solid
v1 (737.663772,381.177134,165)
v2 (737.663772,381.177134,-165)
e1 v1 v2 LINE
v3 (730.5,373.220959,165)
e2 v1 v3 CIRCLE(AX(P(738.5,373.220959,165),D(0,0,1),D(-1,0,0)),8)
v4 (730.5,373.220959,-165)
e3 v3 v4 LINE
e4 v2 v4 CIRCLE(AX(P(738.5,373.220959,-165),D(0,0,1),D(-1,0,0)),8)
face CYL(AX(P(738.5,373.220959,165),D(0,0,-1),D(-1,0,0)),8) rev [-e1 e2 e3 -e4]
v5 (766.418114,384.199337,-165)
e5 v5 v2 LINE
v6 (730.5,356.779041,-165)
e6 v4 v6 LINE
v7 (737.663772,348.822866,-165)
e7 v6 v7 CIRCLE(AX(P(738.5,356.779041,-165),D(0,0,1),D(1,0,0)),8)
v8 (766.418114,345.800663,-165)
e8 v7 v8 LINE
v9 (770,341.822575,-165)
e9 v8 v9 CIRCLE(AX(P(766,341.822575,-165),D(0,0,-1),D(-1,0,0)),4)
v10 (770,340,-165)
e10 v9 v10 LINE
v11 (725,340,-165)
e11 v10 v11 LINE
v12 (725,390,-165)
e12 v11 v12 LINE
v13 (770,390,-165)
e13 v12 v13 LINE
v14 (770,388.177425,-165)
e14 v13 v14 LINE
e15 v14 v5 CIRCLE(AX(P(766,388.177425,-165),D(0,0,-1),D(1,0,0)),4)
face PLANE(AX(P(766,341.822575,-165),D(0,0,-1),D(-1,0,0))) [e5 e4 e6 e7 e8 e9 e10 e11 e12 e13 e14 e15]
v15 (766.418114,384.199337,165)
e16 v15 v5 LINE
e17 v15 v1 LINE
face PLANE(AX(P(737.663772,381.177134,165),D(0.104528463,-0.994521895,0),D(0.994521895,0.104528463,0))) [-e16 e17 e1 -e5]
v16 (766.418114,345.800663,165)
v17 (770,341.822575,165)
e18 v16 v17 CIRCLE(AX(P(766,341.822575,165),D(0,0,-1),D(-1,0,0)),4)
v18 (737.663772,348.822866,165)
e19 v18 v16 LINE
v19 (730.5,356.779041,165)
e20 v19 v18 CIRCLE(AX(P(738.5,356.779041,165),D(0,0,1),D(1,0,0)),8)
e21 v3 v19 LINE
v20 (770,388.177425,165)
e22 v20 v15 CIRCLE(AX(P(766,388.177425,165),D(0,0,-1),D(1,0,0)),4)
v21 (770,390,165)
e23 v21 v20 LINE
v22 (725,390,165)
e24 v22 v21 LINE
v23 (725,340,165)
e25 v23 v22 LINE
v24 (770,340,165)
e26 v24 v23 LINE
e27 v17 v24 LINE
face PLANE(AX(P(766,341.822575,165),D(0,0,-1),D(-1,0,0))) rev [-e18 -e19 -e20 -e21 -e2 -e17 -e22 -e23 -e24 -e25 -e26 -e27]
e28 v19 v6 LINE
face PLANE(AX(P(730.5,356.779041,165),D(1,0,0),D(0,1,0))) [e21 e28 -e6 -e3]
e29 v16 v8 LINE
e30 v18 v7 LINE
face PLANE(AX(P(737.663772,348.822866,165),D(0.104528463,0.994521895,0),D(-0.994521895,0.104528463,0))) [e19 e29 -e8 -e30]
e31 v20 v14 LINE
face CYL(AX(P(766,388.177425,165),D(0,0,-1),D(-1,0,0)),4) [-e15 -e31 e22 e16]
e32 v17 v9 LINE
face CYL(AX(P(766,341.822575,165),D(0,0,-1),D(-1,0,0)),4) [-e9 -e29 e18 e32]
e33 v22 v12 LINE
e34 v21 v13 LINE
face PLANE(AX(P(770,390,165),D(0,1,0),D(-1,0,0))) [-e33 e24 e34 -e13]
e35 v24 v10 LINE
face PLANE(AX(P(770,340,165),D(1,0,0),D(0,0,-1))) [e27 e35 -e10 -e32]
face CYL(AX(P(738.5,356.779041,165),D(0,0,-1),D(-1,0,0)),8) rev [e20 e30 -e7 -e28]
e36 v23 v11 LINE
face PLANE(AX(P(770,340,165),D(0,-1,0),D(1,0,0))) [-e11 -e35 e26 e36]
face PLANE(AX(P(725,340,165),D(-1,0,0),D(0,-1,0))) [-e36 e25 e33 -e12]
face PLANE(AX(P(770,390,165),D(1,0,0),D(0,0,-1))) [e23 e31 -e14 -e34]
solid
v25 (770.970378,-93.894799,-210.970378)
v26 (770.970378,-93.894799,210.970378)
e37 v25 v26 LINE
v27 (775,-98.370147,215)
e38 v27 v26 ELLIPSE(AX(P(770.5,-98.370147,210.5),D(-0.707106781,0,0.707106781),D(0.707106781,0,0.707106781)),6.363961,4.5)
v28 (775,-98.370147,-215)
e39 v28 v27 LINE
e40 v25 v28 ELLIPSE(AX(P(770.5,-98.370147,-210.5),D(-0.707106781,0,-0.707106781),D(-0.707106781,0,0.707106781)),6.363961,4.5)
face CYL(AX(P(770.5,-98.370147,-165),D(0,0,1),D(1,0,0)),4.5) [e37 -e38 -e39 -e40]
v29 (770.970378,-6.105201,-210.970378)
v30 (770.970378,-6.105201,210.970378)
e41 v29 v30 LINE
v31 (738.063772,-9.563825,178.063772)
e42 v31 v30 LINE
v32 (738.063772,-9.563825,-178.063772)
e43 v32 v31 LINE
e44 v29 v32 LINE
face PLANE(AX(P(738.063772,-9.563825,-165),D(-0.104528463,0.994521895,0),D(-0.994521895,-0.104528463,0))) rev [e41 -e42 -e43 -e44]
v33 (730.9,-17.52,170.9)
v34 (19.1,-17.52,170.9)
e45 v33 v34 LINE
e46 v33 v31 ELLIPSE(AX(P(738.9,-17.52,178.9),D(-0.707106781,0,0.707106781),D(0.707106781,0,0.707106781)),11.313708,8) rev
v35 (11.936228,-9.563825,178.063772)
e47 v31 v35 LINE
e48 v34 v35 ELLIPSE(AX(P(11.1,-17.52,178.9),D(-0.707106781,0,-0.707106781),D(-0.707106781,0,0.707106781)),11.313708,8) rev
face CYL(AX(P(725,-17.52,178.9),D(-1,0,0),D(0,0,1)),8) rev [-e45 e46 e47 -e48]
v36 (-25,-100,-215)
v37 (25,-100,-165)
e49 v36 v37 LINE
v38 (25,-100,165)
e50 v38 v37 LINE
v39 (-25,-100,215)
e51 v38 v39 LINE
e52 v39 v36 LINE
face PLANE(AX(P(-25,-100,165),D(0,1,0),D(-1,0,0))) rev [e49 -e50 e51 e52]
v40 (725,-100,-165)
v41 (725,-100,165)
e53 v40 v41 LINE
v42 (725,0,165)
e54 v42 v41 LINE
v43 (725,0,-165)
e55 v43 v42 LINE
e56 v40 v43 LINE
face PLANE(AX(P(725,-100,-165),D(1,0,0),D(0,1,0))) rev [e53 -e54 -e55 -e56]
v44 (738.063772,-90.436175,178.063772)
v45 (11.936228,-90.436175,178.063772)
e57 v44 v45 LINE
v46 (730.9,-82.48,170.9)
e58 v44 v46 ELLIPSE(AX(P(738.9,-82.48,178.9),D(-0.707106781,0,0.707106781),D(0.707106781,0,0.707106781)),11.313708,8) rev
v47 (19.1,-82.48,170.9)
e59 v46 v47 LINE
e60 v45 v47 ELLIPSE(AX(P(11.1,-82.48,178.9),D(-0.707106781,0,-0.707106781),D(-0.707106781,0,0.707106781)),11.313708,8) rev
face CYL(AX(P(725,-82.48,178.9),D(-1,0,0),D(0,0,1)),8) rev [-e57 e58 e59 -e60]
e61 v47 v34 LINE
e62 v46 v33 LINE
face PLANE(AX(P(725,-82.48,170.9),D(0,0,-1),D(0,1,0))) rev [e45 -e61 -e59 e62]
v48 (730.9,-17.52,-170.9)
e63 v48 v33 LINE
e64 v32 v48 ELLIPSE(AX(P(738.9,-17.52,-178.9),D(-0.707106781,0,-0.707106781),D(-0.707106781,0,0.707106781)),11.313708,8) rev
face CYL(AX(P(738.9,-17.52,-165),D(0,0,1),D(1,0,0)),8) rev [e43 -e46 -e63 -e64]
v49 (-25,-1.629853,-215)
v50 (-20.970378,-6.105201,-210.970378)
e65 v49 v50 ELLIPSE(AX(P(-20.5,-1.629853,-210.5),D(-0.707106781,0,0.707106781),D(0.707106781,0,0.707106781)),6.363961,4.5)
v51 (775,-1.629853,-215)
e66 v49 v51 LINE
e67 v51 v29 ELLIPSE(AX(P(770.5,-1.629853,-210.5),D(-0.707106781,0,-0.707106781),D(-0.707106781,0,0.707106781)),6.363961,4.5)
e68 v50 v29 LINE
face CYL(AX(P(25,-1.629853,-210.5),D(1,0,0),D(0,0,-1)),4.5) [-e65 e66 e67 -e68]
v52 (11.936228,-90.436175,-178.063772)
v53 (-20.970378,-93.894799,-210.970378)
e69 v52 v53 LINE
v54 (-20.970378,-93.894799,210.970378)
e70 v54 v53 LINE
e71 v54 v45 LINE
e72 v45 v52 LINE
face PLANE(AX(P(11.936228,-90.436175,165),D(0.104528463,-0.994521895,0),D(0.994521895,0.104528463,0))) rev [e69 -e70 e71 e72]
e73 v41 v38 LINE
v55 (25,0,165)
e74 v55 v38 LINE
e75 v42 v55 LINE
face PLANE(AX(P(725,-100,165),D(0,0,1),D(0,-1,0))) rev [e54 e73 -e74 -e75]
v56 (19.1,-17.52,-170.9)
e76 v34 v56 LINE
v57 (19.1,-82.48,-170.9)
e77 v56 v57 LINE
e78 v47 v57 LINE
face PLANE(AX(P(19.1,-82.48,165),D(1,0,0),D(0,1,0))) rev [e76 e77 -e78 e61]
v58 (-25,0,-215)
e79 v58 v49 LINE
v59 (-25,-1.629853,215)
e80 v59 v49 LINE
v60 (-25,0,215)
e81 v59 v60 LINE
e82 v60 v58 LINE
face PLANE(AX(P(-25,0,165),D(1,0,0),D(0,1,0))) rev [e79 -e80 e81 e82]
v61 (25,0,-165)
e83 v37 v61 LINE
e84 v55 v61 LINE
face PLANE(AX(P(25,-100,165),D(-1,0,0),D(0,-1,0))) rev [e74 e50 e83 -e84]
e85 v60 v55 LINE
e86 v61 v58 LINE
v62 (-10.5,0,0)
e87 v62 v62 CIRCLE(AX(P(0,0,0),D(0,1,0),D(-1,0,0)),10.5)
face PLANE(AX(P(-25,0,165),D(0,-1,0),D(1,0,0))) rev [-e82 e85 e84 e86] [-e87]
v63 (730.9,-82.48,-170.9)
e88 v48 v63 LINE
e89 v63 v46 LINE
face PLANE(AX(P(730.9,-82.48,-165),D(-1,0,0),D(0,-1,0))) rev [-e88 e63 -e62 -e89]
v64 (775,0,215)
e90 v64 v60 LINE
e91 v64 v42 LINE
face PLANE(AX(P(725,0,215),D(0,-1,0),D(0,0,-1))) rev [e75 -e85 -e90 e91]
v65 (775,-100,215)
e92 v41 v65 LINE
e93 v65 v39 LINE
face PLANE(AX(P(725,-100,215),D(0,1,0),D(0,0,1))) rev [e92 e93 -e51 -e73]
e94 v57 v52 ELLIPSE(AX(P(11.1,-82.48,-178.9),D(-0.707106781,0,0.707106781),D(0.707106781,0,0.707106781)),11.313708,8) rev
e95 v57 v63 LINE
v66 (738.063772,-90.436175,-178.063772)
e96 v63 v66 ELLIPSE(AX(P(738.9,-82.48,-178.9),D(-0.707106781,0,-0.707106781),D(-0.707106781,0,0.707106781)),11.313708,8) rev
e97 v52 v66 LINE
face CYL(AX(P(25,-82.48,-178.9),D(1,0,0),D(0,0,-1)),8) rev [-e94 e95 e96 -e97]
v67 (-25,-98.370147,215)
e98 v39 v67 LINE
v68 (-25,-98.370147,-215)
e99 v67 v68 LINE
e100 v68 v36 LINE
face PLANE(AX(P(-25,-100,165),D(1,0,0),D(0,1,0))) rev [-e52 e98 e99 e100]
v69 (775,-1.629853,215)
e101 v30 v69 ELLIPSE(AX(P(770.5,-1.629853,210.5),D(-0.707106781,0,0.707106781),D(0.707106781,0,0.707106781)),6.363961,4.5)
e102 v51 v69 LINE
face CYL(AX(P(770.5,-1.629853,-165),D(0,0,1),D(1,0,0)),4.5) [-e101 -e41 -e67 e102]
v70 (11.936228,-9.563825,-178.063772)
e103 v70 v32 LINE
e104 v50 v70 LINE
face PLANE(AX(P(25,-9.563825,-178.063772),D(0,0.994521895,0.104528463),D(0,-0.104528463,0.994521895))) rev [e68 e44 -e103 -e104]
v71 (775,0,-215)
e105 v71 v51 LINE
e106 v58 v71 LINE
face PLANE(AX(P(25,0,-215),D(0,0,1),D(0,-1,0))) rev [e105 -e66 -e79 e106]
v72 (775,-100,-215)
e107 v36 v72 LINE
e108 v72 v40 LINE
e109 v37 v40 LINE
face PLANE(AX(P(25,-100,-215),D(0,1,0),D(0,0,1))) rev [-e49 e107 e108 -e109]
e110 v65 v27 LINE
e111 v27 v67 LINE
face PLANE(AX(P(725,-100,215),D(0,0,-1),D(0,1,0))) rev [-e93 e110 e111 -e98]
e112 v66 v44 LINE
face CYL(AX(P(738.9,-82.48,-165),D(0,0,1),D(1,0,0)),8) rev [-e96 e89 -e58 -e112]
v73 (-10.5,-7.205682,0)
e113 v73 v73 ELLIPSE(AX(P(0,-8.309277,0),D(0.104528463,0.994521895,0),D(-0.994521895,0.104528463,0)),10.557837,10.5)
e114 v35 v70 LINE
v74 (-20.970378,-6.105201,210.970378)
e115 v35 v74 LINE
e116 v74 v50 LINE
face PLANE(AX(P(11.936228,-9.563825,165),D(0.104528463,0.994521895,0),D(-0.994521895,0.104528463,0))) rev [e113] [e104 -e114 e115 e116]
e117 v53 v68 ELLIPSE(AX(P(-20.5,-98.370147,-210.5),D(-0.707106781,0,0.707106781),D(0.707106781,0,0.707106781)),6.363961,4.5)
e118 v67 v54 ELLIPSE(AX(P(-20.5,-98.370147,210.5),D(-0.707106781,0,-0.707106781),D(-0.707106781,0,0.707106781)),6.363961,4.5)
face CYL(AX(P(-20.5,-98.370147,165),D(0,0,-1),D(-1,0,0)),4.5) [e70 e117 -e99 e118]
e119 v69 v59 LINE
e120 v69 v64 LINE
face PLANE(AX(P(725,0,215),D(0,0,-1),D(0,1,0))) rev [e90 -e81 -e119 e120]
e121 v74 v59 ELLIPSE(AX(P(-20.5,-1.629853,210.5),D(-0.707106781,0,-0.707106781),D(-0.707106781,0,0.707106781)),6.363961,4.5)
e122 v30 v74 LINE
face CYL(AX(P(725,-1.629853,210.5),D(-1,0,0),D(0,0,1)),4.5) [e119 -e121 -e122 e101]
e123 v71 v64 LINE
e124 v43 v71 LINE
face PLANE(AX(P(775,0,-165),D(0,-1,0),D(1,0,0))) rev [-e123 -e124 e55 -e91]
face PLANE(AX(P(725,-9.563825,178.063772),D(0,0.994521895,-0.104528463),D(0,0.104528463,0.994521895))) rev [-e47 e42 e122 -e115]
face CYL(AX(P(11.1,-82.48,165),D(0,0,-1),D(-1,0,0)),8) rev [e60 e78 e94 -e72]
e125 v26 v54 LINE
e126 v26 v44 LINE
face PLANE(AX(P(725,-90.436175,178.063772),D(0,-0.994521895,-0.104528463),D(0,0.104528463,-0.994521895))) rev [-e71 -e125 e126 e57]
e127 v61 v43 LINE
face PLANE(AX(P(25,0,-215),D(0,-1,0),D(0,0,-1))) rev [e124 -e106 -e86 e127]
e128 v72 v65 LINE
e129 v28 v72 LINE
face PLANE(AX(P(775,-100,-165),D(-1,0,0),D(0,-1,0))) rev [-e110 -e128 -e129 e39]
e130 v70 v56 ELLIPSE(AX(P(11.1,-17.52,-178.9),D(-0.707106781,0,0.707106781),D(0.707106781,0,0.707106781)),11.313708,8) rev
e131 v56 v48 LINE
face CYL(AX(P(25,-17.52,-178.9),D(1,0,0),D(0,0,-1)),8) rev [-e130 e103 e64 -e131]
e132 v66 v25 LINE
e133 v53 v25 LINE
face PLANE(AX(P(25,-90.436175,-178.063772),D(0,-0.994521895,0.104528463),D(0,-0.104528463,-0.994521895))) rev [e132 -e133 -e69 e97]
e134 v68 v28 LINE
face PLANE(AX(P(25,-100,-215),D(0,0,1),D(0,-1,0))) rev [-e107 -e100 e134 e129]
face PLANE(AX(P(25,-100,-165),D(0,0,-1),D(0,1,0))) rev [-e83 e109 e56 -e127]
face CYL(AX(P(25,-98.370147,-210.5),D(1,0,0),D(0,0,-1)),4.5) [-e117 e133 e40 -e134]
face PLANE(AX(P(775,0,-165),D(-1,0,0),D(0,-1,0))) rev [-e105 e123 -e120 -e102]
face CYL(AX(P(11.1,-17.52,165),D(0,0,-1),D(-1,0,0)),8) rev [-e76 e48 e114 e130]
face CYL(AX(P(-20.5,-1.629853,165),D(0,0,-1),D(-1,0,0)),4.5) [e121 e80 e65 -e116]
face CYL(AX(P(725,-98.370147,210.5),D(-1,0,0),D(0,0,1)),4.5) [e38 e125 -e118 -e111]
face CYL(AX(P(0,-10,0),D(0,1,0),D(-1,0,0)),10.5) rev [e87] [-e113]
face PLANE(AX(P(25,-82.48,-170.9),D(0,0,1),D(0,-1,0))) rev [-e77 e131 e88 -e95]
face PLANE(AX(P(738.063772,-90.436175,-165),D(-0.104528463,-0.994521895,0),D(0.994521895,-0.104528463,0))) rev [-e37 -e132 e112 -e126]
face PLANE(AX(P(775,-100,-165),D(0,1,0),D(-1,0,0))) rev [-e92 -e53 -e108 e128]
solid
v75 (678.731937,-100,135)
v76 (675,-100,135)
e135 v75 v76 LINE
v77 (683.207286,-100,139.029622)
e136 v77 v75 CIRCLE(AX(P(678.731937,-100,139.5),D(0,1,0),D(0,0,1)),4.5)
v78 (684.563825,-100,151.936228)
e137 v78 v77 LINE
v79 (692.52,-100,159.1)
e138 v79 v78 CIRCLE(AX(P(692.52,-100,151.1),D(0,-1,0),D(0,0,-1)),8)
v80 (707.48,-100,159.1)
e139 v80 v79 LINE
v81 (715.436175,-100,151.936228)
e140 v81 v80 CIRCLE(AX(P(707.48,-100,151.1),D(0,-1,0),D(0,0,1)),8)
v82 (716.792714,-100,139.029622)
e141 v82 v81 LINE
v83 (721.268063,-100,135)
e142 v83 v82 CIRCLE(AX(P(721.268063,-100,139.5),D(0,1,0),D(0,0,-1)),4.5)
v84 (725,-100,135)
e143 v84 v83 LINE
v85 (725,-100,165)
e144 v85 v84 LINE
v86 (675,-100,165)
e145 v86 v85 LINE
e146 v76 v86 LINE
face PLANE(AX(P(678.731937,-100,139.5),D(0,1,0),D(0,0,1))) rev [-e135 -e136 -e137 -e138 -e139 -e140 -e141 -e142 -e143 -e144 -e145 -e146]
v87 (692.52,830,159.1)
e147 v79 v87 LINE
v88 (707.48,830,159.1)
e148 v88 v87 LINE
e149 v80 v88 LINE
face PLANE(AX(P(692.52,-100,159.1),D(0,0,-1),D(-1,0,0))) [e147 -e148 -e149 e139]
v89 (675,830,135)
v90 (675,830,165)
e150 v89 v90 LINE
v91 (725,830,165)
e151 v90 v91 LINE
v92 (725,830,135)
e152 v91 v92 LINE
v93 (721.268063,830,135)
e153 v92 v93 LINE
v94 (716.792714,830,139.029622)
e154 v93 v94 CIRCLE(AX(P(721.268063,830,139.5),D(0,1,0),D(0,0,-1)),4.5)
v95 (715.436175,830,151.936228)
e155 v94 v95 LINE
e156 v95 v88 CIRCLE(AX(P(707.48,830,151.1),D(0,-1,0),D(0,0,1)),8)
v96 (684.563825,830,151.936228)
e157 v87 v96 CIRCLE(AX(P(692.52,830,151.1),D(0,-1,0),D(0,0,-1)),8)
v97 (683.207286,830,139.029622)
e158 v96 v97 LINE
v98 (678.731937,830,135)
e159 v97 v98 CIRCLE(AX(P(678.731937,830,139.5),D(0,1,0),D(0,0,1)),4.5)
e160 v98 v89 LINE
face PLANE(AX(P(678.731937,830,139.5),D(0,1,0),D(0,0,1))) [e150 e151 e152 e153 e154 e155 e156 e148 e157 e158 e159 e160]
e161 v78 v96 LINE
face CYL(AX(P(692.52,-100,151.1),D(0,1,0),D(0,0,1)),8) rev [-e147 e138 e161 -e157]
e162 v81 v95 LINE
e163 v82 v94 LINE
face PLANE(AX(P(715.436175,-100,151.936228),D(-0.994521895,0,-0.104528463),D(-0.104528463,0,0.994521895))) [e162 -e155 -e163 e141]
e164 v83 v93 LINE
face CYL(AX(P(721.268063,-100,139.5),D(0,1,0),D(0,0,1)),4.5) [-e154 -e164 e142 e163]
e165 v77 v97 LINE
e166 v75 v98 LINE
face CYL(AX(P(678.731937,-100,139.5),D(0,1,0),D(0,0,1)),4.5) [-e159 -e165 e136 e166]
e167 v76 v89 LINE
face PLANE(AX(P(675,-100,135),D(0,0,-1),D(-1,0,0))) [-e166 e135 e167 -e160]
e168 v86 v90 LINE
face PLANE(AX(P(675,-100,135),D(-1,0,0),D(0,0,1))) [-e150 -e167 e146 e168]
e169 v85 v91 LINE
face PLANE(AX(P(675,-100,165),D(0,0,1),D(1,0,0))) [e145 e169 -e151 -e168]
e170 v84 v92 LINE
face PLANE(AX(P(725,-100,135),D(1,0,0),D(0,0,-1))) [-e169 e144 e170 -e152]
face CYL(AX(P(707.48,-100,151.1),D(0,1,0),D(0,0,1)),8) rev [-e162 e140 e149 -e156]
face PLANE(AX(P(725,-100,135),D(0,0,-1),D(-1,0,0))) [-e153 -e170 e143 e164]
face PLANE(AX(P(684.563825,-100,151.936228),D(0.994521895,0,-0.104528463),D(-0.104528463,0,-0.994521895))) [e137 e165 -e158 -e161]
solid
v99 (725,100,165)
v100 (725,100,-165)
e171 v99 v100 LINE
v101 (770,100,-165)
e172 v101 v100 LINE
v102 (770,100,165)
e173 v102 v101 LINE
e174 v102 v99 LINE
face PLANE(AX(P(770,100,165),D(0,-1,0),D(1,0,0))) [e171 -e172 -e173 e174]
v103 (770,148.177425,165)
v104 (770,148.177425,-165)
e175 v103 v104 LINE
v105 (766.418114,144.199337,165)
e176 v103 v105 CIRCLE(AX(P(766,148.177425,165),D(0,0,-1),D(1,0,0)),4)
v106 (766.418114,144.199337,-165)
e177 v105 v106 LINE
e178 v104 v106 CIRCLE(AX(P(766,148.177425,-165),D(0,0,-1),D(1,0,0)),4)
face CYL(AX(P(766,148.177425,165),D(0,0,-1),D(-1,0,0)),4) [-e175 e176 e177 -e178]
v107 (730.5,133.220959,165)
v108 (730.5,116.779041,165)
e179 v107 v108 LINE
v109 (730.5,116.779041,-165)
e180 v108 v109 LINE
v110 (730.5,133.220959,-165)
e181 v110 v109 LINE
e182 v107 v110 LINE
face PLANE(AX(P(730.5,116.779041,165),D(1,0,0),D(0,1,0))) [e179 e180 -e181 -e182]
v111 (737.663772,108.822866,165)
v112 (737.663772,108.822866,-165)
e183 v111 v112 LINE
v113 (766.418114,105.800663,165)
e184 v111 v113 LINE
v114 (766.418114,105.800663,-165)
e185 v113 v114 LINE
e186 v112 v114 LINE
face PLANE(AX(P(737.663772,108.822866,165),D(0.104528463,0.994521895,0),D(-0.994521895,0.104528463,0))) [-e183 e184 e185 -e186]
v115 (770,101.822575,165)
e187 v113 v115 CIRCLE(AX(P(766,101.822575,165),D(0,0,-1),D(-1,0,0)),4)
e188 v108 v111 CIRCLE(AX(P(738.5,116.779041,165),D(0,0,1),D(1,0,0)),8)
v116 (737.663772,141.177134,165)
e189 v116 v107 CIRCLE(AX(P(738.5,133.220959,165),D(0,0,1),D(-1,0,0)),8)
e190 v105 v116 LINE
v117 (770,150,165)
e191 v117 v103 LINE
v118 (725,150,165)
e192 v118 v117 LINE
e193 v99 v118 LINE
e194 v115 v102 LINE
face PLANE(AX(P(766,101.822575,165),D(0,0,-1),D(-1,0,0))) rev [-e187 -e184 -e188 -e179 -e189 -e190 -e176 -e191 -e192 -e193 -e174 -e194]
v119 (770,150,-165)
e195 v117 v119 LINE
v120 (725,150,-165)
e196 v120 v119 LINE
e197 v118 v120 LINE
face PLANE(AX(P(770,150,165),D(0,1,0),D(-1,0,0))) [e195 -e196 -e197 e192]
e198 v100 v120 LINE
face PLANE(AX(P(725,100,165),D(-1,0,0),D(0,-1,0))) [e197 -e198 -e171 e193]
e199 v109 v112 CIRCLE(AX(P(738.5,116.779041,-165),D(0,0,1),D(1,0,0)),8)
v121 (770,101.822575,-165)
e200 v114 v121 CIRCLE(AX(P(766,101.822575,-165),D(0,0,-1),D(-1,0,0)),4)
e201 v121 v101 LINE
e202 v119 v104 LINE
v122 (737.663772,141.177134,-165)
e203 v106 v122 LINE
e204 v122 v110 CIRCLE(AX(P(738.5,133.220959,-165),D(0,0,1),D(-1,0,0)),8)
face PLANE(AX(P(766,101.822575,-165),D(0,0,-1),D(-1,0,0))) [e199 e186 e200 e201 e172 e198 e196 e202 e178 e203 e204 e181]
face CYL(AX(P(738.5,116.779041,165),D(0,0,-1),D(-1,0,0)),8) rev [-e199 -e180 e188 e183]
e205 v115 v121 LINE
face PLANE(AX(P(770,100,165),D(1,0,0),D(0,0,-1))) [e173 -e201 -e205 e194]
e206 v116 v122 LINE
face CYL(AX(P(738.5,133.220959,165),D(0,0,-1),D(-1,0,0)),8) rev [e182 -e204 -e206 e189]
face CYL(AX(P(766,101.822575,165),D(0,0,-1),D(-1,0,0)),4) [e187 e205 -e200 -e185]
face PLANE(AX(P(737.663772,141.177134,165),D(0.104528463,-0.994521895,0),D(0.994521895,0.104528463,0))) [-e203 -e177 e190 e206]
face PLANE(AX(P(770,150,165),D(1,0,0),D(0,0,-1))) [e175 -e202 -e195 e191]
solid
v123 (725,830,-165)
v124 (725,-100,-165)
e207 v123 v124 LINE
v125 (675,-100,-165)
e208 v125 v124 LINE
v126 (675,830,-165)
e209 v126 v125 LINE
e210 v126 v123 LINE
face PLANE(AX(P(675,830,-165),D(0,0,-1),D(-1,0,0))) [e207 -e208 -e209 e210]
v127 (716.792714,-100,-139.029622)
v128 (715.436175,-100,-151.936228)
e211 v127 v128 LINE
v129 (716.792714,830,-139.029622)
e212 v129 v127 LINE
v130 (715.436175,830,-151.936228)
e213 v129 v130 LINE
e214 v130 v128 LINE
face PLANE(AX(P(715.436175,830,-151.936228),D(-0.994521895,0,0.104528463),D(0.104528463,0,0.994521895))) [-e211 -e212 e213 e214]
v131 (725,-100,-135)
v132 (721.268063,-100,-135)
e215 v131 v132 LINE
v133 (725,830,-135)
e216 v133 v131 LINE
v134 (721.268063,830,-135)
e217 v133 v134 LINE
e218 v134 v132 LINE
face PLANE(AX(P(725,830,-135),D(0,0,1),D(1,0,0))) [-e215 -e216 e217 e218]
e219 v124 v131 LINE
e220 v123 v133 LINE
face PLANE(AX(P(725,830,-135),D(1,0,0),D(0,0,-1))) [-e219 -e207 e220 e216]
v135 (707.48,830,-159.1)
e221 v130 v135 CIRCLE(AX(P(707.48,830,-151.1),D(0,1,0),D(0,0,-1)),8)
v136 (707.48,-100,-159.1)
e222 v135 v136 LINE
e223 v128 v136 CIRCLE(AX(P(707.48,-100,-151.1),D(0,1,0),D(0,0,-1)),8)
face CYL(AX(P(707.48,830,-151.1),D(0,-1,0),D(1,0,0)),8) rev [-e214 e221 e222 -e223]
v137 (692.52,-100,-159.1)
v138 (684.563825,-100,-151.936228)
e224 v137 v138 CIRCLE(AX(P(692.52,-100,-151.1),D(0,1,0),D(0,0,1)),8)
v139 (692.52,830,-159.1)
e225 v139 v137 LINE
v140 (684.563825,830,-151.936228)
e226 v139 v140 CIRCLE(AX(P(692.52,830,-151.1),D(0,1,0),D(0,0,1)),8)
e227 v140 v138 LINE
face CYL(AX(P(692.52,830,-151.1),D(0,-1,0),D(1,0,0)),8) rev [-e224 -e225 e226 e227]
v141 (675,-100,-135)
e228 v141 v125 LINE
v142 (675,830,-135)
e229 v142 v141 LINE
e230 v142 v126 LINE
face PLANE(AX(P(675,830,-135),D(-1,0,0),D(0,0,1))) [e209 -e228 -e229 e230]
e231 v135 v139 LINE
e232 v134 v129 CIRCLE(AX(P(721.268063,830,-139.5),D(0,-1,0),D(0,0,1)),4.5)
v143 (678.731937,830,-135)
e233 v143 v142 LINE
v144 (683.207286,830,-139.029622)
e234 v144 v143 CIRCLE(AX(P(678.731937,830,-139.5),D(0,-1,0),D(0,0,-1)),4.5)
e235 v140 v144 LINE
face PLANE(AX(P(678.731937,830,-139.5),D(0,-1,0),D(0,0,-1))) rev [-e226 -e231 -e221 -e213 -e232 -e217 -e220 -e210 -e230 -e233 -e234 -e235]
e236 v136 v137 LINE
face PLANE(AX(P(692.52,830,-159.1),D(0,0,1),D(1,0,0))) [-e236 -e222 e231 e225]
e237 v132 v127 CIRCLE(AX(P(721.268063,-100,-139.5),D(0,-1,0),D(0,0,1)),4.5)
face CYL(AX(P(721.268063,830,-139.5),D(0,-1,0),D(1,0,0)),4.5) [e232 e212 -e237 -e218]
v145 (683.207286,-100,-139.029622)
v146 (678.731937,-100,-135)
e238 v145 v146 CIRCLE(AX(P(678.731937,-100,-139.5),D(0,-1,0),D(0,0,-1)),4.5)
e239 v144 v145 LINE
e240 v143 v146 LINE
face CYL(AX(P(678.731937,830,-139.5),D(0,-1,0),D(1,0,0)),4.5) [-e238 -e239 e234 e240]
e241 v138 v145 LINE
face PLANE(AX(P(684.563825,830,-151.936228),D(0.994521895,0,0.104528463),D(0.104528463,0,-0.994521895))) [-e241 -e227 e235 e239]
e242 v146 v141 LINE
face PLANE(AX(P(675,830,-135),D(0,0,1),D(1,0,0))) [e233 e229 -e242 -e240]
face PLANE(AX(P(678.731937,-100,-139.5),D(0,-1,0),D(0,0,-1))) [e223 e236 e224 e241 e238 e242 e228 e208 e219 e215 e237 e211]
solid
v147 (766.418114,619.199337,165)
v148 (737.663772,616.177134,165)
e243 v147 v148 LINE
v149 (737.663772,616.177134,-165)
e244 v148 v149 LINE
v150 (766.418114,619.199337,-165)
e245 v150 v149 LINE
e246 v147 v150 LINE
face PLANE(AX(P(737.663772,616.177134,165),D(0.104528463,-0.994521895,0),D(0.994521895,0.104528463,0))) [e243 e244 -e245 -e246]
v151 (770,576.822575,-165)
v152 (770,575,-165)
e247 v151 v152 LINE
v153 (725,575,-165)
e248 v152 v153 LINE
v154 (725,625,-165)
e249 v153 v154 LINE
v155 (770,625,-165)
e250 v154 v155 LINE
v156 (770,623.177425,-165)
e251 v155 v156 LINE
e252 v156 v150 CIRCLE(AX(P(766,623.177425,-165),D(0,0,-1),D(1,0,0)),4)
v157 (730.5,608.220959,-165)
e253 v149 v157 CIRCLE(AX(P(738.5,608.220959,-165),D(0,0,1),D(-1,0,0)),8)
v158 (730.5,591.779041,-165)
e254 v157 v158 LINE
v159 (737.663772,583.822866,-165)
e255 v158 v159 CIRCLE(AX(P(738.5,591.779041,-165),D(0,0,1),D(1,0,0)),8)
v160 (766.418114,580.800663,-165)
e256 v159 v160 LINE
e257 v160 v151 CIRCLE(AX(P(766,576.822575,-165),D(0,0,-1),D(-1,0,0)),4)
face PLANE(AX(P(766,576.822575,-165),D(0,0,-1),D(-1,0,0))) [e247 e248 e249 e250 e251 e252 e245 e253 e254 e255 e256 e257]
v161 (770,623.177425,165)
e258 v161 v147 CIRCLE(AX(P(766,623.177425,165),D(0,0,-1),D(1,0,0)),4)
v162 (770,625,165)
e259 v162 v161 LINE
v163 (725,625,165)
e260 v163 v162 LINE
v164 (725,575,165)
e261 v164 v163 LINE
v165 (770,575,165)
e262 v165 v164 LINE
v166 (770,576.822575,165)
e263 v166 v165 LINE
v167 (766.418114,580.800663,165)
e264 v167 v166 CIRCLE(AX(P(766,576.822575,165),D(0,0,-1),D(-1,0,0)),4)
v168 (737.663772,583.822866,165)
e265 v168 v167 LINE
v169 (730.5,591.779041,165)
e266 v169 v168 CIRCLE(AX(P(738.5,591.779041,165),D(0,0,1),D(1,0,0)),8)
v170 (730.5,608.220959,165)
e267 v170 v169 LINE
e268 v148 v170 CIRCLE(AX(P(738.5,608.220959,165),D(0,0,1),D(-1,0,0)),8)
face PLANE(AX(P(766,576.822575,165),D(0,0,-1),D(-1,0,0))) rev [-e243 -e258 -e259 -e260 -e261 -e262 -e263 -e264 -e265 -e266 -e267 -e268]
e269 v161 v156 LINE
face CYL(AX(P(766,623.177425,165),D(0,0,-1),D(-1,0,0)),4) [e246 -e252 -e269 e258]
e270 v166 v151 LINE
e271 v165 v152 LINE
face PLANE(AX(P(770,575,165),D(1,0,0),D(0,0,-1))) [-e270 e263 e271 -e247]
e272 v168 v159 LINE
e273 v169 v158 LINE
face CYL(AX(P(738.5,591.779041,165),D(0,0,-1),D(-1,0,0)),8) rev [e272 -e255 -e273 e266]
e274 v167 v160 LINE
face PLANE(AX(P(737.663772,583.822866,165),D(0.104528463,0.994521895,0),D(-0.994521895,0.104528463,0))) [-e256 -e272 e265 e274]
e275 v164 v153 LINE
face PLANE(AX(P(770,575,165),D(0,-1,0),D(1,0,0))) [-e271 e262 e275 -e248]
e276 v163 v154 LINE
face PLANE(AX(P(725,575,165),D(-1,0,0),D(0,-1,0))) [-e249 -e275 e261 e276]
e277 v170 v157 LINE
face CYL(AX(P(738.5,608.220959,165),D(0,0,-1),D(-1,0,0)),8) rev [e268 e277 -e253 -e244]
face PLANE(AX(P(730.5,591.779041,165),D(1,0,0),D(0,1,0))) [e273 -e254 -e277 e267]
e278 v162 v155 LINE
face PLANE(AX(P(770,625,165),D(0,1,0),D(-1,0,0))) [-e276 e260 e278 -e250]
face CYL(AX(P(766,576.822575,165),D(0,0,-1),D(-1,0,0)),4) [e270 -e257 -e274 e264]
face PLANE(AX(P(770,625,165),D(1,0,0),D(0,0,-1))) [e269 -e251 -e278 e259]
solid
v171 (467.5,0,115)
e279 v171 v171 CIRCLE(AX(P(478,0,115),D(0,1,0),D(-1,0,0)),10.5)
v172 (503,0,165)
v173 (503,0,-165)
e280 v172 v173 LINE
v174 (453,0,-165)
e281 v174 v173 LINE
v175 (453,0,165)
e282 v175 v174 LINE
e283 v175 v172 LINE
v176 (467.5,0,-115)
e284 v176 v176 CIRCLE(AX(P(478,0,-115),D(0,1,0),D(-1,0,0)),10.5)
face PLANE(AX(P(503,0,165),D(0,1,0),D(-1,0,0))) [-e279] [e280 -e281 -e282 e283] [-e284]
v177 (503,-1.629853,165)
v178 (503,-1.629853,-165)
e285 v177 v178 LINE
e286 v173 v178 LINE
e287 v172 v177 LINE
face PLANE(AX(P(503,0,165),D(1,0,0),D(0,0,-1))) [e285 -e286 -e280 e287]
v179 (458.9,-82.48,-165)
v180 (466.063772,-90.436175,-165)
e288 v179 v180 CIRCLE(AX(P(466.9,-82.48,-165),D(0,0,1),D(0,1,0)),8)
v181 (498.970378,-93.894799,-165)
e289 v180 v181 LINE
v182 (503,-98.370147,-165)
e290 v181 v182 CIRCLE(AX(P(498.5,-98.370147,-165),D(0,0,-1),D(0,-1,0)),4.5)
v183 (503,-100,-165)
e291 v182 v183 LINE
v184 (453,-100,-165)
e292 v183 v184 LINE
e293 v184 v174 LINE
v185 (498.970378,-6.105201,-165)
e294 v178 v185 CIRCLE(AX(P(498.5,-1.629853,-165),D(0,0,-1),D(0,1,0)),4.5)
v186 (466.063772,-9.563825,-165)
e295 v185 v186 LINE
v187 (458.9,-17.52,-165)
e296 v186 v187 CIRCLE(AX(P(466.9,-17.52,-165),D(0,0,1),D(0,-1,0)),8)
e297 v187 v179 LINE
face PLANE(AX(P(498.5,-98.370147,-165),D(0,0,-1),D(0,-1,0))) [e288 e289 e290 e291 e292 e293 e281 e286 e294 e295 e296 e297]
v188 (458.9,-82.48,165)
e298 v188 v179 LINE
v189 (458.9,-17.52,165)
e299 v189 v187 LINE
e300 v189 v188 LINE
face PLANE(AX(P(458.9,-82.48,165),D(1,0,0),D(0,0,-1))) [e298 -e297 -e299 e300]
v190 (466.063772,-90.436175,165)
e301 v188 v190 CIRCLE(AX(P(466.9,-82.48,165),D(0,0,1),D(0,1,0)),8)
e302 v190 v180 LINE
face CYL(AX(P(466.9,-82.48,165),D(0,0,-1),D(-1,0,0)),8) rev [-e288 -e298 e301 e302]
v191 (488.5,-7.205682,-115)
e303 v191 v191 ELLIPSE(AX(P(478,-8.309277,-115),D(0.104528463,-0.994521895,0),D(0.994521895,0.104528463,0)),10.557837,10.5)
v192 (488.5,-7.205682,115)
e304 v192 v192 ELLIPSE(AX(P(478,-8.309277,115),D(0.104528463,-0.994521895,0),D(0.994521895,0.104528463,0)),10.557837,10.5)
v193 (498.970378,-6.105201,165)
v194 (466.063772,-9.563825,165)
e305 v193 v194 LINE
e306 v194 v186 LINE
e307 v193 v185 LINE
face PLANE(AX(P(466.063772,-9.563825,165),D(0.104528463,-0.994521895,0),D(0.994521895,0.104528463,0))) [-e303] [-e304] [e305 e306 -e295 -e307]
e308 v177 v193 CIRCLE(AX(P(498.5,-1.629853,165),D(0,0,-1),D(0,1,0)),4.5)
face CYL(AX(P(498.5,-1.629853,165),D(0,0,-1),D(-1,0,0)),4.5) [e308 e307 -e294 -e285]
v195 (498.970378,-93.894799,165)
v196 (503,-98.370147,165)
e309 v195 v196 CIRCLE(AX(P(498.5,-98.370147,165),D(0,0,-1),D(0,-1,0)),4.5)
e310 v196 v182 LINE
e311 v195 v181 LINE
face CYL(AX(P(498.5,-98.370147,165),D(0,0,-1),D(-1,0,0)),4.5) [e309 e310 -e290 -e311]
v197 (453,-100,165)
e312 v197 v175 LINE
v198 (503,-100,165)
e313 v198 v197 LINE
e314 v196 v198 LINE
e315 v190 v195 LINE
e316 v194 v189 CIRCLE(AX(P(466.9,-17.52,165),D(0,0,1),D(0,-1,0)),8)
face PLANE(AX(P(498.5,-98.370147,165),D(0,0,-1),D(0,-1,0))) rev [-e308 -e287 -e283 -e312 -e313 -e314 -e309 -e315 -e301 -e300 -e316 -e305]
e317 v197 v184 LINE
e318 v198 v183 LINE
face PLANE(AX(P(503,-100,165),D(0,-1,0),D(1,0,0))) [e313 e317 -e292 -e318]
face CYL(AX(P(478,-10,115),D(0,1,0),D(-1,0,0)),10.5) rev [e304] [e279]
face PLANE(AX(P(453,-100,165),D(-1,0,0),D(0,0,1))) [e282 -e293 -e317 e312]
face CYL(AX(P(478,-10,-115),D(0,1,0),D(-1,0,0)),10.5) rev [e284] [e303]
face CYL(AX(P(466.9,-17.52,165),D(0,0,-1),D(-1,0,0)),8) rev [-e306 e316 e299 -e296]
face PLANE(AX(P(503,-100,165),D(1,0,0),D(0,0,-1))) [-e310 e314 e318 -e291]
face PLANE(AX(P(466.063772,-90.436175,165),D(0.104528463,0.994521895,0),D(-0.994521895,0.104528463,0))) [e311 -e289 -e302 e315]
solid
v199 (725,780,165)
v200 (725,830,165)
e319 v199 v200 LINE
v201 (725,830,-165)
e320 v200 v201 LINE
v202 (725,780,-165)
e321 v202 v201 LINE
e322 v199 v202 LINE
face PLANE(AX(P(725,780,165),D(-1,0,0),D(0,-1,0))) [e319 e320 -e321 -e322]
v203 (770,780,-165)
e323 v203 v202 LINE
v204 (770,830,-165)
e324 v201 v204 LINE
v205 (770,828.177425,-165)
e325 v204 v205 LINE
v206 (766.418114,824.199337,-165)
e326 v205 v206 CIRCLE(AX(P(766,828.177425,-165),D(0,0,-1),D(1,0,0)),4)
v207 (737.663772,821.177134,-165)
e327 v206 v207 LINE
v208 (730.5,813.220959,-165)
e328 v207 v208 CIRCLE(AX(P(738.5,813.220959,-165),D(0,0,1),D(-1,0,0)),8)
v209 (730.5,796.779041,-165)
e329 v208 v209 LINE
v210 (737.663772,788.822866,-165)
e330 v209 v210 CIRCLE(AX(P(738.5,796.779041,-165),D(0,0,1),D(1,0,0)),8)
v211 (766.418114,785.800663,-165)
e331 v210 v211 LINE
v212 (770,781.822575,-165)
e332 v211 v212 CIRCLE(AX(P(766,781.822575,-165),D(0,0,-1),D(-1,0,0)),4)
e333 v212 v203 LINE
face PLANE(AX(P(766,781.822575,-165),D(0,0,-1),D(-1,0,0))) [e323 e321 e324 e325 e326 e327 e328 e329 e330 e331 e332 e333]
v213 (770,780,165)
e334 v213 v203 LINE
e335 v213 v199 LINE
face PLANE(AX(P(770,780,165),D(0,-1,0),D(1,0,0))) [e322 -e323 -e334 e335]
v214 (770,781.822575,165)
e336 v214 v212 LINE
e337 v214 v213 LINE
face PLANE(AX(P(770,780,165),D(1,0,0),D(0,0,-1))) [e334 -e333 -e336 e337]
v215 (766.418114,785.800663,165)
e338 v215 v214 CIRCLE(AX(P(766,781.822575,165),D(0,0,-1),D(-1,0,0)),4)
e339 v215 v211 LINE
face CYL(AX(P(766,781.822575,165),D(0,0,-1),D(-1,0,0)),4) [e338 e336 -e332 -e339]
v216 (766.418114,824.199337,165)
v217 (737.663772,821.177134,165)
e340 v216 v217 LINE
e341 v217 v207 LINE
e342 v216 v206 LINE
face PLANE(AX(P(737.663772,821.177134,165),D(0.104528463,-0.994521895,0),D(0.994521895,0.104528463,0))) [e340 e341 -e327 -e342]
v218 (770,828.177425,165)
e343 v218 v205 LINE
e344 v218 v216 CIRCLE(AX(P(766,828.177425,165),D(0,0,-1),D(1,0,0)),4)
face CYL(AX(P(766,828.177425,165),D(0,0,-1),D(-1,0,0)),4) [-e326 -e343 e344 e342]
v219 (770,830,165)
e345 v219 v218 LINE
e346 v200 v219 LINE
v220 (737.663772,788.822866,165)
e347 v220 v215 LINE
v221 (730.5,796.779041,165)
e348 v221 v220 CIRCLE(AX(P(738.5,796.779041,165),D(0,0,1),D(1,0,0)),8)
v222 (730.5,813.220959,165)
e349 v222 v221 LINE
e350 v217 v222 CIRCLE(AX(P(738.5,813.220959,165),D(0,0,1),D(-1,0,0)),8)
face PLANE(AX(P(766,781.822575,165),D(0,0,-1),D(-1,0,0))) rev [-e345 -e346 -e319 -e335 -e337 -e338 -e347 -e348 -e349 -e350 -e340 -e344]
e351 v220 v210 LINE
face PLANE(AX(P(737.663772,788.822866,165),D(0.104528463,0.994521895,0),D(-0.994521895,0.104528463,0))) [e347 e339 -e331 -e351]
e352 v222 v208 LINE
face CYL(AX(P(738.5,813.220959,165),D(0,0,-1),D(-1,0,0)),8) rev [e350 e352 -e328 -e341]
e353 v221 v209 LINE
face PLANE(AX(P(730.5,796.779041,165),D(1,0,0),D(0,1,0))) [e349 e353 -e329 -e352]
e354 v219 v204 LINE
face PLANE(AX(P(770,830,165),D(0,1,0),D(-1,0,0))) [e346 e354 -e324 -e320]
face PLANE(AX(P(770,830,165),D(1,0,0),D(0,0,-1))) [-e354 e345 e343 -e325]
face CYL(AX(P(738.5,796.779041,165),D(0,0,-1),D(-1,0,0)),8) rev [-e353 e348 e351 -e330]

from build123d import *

# Parameters (mm, degrees)
MEMBER_1_DEPTH      = 442.803398875
MEMBER_1_DEPTH_BACK = 112.803398875
MEMBER_1_2_DEPTH    = 925.60679775
MEMBER_1_3_DEPTH    = 555.60679775
MEMBER_1_4_DEPTH    = 925.60679775
MEMBER_2_DEPTH      = 330
SKETCH_4_R          = 10.5
CUT_EXTRUDE_1_DEPTH = 10
MEMBER_START        = -100
MEMBER_3_DEPTH      = 930
MEMBER_5_DEPTH      = 330
MEMBER_5_2_DEPTH    = 330
MEMBER_5_3_DEPTH    = 330
MEMBER_5_4_DEPTH    = 330


# Read off the part's stored shape, not the designer's step: Конструкция3
with BuildPart() as part:
    # Sketch1 → Member 1 (new, two sides: drawn at the far end of the back side and taken through both)
    with BuildSketch(Plane(origin=(25, 0, -165), x_dir=(-1, 0, 0), z_dir=(0, 0, 1)).offset(-MEMBER_1_DEPTH_BACK)):
        with BuildLine():
            Line((50, 100), (0, 100))
            Line((0, 100), (0, 0))
            Line((0, 0), (50, 0))
            Line((50, 0), (50, 1.629852671))
            ThreePointArc((50, 1.629852671), (48.844151715, 4.6409404), (45.970378085, 6.1052012))
            Line((45.970378085, 6.1052012), (13.063772294, 9.563824837))
            ThreePointArc((13.063772294, 9.563824837), (7.954841396, 12.166955149), (5.9, 17.52))
            Line((5.9, 17.52), (5.9, 82.48))
            ThreePointArc((5.9, 82.48), (7.954841396, 87.833044851), (13.063772294, 90.436175163))
            Line((13.063772294, 90.436175163), (45.970378085, 93.8947988))
            ThreePointArc((45.970378085, 93.8947988), (48.844151715, 95.3590596), (50, 98.370147329))
            Line((50, 98.370147329), (50, 100))
        make_face()
    extrude(amount=MEMBER_1_DEPTH + MEMBER_1_DEPTH_BACK)

    # Member 1 mitre 1
    split(bisect_by=Plane(origin=(25, 0, -165), x_dir=(0, -1, 0), z_dir=(-0.707106781, 0, 0.707106781)), keep=Keep.TOP)

    # Member 1 mitre 2
    split(bisect_by=Plane(origin=(25, 0, 165), x_dir=(0, -1, 0), z_dir=(-0.707106781, 0, -0.707106781)), keep=Keep.TOP)


with BuildPart() as body_2:
    # Sketch1 on segment 2 (carried to segment 2) → Member 1 2 (new body)
    with BuildSketch(Plane(origin=(-87.803398875, 0, 165), x_dir=(0, 0, 1), z_dir=(1, 0, 0))):
        with BuildLine():
            Line((50, 100), (0, 100))
            Line((0, 100), (0, 0))
            Line((0, 0), (50, 0))
            Line((50, 0), (50, 1.629852671))
            ThreePointArc((50, 1.629852671), (48.844151715, 4.6409404), (45.970378085, 6.1052012))
            Line((45.970378085, 6.1052012), (13.063772294, 9.563824837))
            ThreePointArc((13.063772294, 9.563824837), (7.954841396, 12.166955149), (5.9, 17.52))
            Line((5.9, 17.52), (5.9, 82.48))
            ThreePointArc((5.9, 82.48), (7.954841396, 87.833044851), (13.063772294, 90.436175163))
            Line((13.063772294, 90.436175163), (45.970378085, 93.8947988))
            ThreePointArc((45.970378085, 93.8947988), (48.844151715, 95.3590596), (50, 98.370147329))
            Line((50, 98.370147329), (50, 100))
        make_face()
    extrude(amount=MEMBER_1_2_DEPTH)

    # Member 1 2 mitre 1
    split(bisect_by=Plane(origin=(25, 0, 165), x_dir=(0, 1, 0), z_dir=(0.707106781, 0, 0.707106781)), keep=Keep.TOP)

    # Member 1 2 mitre 2
    split(bisect_by=Plane(origin=(725, 0, 165), x_dir=(0, -1, 0), z_dir=(-0.707106781, 0, 0.707106781)), keep=Keep.TOP)


with BuildPart() as body_3:
    # Sketch1 on segment 3 (carried to segment 3) → Member 1 3 (new body)
    with BuildSketch(Plane(origin=(725, 0, 277.803398875), x_dir=(1, 0, 0), z_dir=(0, 0, -1))):
        with BuildLine():
            Line((50, 100), (0, 100))
            Line((0, 100), (0, 0))
            Line((0, 0), (50, 0))
            Line((50, 0), (50, 1.629852671))
            ThreePointArc((50, 1.629852671), (48.844151715, 4.6409404), (45.970378085, 6.1052012))
            Line((45.970378085, 6.1052012), (13.063772294, 9.563824837))
            ThreePointArc((13.063772294, 9.563824837), (7.954841396, 12.166955149), (5.9, 17.52))
            Line((5.9, 17.52), (5.9, 82.48))
            ThreePointArc((5.9, 82.48), (7.954841396, 87.833044851), (13.063772294, 90.436175163))
            Line((13.063772294, 90.436175163), (45.970378085, 93.8947988))
            ThreePointArc((45.970378085, 93.8947988), (48.844151715, 95.3590596), (50, 98.370147329))
            Line((50, 98.370147329), (50, 100))
        make_face()
    extrude(amount=MEMBER_1_3_DEPTH)

    # Member 1 3 mitre 1
    split(bisect_by=Plane(origin=(725, 0, 165), x_dir=(0, 1, 0), z_dir=(0.707106781, 0, -0.707106781)), keep=Keep.TOP)

    # Member 1 3 mitre 2
    split(bisect_by=Plane(origin=(725, 0, -165), x_dir=(0, 1, 0), z_dir=(0.707106781, 0, 0.707106781)), keep=Keep.TOP)


with BuildPart() as body_4:
    # Sketch1 on segment 4 (carried to segment 4) → Member 1 4 (new body)
    with BuildSketch(Plane(origin=(837.803398875, 0, -165), x_dir=(0, 0, -1), z_dir=(-1, 0, 0))):
        with BuildLine():
            Line((50, 100), (0, 100))
            Line((0, 100), (0, 0))
            Line((0, 0), (50, 0))
            Line((50, 0), (50, 1.629852671))
            ThreePointArc((50, 1.629852671), (48.844151715, 4.6409404), (45.970378085, 6.1052012))
            Line((45.970378085, 6.1052012), (13.063772294, 9.563824837))
            ThreePointArc((13.063772294, 9.563824837), (7.954841396, 12.166955149), (5.9, 17.52))
            Line((5.9, 17.52), (5.9, 82.48))
            ThreePointArc((5.9, 82.48), (7.954841396, 87.833044851), (13.063772294, 90.436175163))
            Line((13.063772294, 90.436175163), (45.970378085, 93.8947988))
            ThreePointArc((45.970378085, 93.8947988), (48.844151715, 95.3590596), (50, 98.370147329))
            Line((50, 98.370147329), (50, 100))
        make_face()
    extrude(amount=MEMBER_1_4_DEPTH)

    # Member 1 4 mitre 1
    split(bisect_by=Plane(origin=(25, 0, -165), x_dir=(0, 1, 0), z_dir=(0.707106781, 0, -0.707106781)), keep=Keep.TOP)

    # Member 1 4 mitre 2
    split(bisect_by=Plane(origin=(725, 0, -165), x_dir=(0, -1, 0), z_dir=(-0.707106781, 0, -0.707106781)), keep=Keep.TOP)


with BuildPart() as part_1:
    add(part.part)

    # Member 1 as one body: union body 2, body 3, body 4
    add(body_2.part)
    add(body_3.part)
    add(body_4.part)


with BuildPart() as body_2_2:
    # Sketch11 → Member 2 (new body)
    with BuildSketch(Plane(origin=(453, 0, -165), x_dir=(1, 0, 0), z_dir=(0, 0, -1))):
        with BuildLine():
            Line((50, 100), (0, 100))
            Line((0, 100), (0, 0))
            Line((0, 0), (50, 0))
            Line((50, 0), (50, 1.629852671))
            ThreePointArc((50, 1.629852671), (48.844151715, 4.6409404), (45.970378085, 6.1052012))
            Line((45.970378085, 6.1052012), (13.063772294, 9.563824837))
            ThreePointArc((13.063772294, 9.563824837), (7.954841396, 12.166955149), (5.9, 17.52))
            Line((5.9, 17.52), (5.9, 82.48))
            ThreePointArc((5.9, 82.48), (7.954841396, 87.833044851), (13.063772294, 90.436175163))
            Line((13.063772294, 90.436175163), (45.970378085, 93.8947988))
            ThreePointArc((45.970378085, 93.8947988), (48.844151715, 95.3590596), (50, 98.370147329))
            Line((50, 98.370147329), (50, 100))
        make_face()
    extrude(amount=-MEMBER_2_DEPTH)


with BuildPart() as cut_extrude_1_tool:
    # Эскиз4 → Вырез-Вытянуть1 (new body)
    with BuildSketch(Plane(origin=(0, 0, 0), x_dir=(1, 0, 0), z_dir=(0, 1, 0))):
        with Locations(Location((0, 0, 0), (0, 0, 180))):
            Circle(SKETCH_4_R)
        with Locations(Location((478, -115, 0), (0, 0, 180))):
            Circle(SKETCH_4_R)
        with Locations(Location((478, 115, 0), (0, 0, 180))):
            Circle(SKETCH_4_R)
    extrude(amount=-CUT_EXTRUDE_1_DEPTH)


with BuildPart() as part_2:
    add(part_1.part)

    # Вырез-Вытянуть1: cut by cut_extrude_1_tool
    add(cut_extrude_1_tool.part, mode=Mode.SUBTRACT)


with BuildPart() as body_2_2_1:
    add(body_2_2.part)

    # Вырез-Вытянуть1: cut by cut_extrude_1_tool
    add(cut_extrude_1_tool.part, mode=Mode.SUBTRACT)


with BuildPart() as body_3_2:
    # Member 3 outline → Member 3 (new body)
    with BuildSketch(Plane(origin=(0, 0, 0), x_dir=(1, 0, 0), z_dir=(0, 1, 0)).offset(MEMBER_START)):
        with BuildLine():
            Line((684.563824837, -151.936227706), (683.207285906, -139.029621915))
            ThreePointArc((683.207285906, -139.029621915), (681.743025105, -136.155848285), (678.731937376, -135))
            Line((678.731937376, -135), (675, -135))
            Line((675, -135), (675, -165))
            Line((675, -165), (725, -165))
            Line((725, -165), (725, -135))
            Line((725, -135), (721.268062624, -135))
            ThreePointArc((721.268062624, -135), (718.256974895, -136.155848285), (716.792714094, -139.029621915))
            Line((716.792714094, -139.029621915), (715.436175163, -151.936227706))
            ThreePointArc((715.436175163, -151.936227706), (712.833044851, -157.045158604), (707.48, -159.1))
            Line((707.48, -159.1), (692.52, -159.1))
            ThreePointArc((692.52, -159.1), (687.166955149, -157.045158604), (684.563824837, -151.936227706))
        make_face()
        with BuildLine():
            Line((721.268062624, 135), (725, 135))
            Line((725, 135), (725, 165))
            Line((725, 165), (675, 165))
            Line((675, 165), (675, 135))
            Line((675, 135), (678.731937376, 135))
            ThreePointArc((678.731937376, 135), (681.743025105, 136.155848285), (683.207285906, 139.029621915))
            Line((683.207285906, 139.029621915), (684.563824837, 151.936227706))
            ThreePointArc((684.563824837, 151.936227706), (687.166955149, 157.045158604), (692.52, 159.1))
            Line((692.52, 159.1), (707.48, 159.1))
            ThreePointArc((707.48, 159.1), (712.833044851, 157.045158604), (715.436175163, 151.936227706))
            Line((715.436175163, 151.936227706), (716.792714094, 139.029621915))
            ThreePointArc((716.792714094, 139.029621915), (718.256974895, 136.155848285), (721.268062624, 135))
        make_face()
    extrude(amount=MEMBER_3_DEPTH)


with BuildPart() as body_4_2:
    # Sketch16 → Member 5 (new body)
    with BuildSketch(Plane(origin=(725, 830, -165), x_dir=(1, 0, 0), z_dir=(0, 0, -1))):
        with BuildLine():
            Line((45, 50), (0, 50))
            Line((0, 50), (0, 0))
            Line((0, 0), (45, 0))
            Line((45, 0), (45, 1.822575176))
            ThreePointArc((45, 1.822575176), (43.972579302, 4.499097602), (41.418113853, 5.800662758))
            Line((41.418113853, 5.800662758), (12.663772294, 8.822865838))
            ThreePointArc((12.663772294, 8.822865838), (7.554841396, 11.42599615), (5.5, 16.779041001))
            Line((5.5, 16.779041001), (5.5, 33.220958999))
            ThreePointArc((5.5, 33.220958999), (7.554841396, 38.57400385), (12.663772294, 41.177134162))
            Line((12.663772294, 41.177134162), (41.418113853, 44.199337242))
            ThreePointArc((41.418113853, 44.199337242), (43.972579302, 45.500902398), (45, 48.177424824))
            Line((45, 48.177424824), (45, 50))
        make_face()
    extrude(amount=-MEMBER_5_DEPTH)


with BuildPart() as body_5:
    # Sketch16 on segment 2 (carried to segment 2) → Member 5 2 (new body)
    with BuildSketch(Plane(origin=(725, 150, 165), x_dir=(1, 0, 0), z_dir=(0, 0, -1))):
        with BuildLine():
            Line((45, 50), (0, 50))
            Line((0, 50), (0, 0))
            Line((0, 0), (45, 0))
            Line((45, 0), (45, 1.822575176))
            ThreePointArc((45, 1.822575176), (43.972579302, 4.499097602), (41.418113853, 5.800662758))
            Line((41.418113853, 5.800662758), (12.663772294, 8.822865838))
            ThreePointArc((12.663772294, 8.822865838), (7.554841396, 11.42599615), (5.5, 16.779041001))
            Line((5.5, 16.779041001), (5.5, 33.220958999))
            ThreePointArc((5.5, 33.220958999), (7.554841396, 38.57400385), (12.663772294, 41.177134162))
            Line((12.663772294, 41.177134162), (41.418113853, 44.199337242))
            ThreePointArc((41.418113853, 44.199337242), (43.972579302, 45.500902398), (45, 48.177424824))
            Line((45, 48.177424824), (45, 50))
        make_face()
    extrude(amount=MEMBER_5_2_DEPTH)


with BuildPart() as body_6:
    # Sketch16 on segment 3 (carried to segment 3) → Member 5 3 (new body)
    with BuildSketch(Plane(origin=(725, 625, 165), x_dir=(1, 0, 0), z_dir=(0, 0, -1))):
        with BuildLine():
            Line((45, 50), (0, 50))
            Line((0, 50), (0, 0))
            Line((0, 0), (45, 0))
            Line((45, 0), (45, 1.822575176))
            ThreePointArc((45, 1.822575176), (43.972579302, 4.499097602), (41.418113853, 5.800662758))
            Line((41.418113853, 5.800662758), (12.663772294, 8.822865838))
            ThreePointArc((12.663772294, 8.822865838), (7.554841396, 11.42599615), (5.5, 16.779041001))
            Line((5.5, 16.779041001), (5.5, 33.220958999))
            ThreePointArc((5.5, 33.220958999), (7.554841396, 38.57400385), (12.663772294, 41.177134162))
            Line((12.663772294, 41.177134162), (41.418113853, 44.199337242))
            ThreePointArc((41.418113853, 44.199337242), (43.972579302, 45.500902398), (45, 48.177424824))
            Line((45, 48.177424824), (45, 50))
        make_face()
    extrude(amount=MEMBER_5_3_DEPTH)


with BuildPart() as body_7:
    # Sketch16 on segment 4 (carried to segment 4) → Member 5 4 (new body)
    with BuildSketch(Plane(origin=(725, 390, 165), x_dir=(1, 0, 0), z_dir=(0, 0, -1))):
        with BuildLine():
            Line((45, 50), (0, 50))
            Line((0, 50), (0, 0))
            Line((0, 0), (45, 0))
            Line((45, 0), (45, 1.822575176))
            ThreePointArc((45, 1.822575176), (43.972579302, 4.499097602), (41.418113853, 5.800662758))
            Line((41.418113853, 5.800662758), (12.663772294, 8.822865838))
            ThreePointArc((12.663772294, 8.822865838), (7.554841396, 11.42599615), (5.5, 16.779041001))
            Line((5.5, 16.779041001), (5.5, 33.220958999))
            ThreePointArc((5.5, 33.220958999), (7.554841396, 38.57400385), (12.663772294, 41.177134162))
            Line((12.663772294, 41.177134162), (41.418113853, 44.199337242))
            ThreePointArc((41.418113853, 44.199337242), (43.972579302, 45.500902398), (45, 48.177424824))
            Line((45, 48.177424824), (45, 50))
        make_face()
    extrude(amount=MEMBER_5_4_DEPTH)


solid = Compound([part_2.part, body_2_2_1.part, body_3_2.part, body_4_2.part, body_5.part, body_6.part, body_7.part])
